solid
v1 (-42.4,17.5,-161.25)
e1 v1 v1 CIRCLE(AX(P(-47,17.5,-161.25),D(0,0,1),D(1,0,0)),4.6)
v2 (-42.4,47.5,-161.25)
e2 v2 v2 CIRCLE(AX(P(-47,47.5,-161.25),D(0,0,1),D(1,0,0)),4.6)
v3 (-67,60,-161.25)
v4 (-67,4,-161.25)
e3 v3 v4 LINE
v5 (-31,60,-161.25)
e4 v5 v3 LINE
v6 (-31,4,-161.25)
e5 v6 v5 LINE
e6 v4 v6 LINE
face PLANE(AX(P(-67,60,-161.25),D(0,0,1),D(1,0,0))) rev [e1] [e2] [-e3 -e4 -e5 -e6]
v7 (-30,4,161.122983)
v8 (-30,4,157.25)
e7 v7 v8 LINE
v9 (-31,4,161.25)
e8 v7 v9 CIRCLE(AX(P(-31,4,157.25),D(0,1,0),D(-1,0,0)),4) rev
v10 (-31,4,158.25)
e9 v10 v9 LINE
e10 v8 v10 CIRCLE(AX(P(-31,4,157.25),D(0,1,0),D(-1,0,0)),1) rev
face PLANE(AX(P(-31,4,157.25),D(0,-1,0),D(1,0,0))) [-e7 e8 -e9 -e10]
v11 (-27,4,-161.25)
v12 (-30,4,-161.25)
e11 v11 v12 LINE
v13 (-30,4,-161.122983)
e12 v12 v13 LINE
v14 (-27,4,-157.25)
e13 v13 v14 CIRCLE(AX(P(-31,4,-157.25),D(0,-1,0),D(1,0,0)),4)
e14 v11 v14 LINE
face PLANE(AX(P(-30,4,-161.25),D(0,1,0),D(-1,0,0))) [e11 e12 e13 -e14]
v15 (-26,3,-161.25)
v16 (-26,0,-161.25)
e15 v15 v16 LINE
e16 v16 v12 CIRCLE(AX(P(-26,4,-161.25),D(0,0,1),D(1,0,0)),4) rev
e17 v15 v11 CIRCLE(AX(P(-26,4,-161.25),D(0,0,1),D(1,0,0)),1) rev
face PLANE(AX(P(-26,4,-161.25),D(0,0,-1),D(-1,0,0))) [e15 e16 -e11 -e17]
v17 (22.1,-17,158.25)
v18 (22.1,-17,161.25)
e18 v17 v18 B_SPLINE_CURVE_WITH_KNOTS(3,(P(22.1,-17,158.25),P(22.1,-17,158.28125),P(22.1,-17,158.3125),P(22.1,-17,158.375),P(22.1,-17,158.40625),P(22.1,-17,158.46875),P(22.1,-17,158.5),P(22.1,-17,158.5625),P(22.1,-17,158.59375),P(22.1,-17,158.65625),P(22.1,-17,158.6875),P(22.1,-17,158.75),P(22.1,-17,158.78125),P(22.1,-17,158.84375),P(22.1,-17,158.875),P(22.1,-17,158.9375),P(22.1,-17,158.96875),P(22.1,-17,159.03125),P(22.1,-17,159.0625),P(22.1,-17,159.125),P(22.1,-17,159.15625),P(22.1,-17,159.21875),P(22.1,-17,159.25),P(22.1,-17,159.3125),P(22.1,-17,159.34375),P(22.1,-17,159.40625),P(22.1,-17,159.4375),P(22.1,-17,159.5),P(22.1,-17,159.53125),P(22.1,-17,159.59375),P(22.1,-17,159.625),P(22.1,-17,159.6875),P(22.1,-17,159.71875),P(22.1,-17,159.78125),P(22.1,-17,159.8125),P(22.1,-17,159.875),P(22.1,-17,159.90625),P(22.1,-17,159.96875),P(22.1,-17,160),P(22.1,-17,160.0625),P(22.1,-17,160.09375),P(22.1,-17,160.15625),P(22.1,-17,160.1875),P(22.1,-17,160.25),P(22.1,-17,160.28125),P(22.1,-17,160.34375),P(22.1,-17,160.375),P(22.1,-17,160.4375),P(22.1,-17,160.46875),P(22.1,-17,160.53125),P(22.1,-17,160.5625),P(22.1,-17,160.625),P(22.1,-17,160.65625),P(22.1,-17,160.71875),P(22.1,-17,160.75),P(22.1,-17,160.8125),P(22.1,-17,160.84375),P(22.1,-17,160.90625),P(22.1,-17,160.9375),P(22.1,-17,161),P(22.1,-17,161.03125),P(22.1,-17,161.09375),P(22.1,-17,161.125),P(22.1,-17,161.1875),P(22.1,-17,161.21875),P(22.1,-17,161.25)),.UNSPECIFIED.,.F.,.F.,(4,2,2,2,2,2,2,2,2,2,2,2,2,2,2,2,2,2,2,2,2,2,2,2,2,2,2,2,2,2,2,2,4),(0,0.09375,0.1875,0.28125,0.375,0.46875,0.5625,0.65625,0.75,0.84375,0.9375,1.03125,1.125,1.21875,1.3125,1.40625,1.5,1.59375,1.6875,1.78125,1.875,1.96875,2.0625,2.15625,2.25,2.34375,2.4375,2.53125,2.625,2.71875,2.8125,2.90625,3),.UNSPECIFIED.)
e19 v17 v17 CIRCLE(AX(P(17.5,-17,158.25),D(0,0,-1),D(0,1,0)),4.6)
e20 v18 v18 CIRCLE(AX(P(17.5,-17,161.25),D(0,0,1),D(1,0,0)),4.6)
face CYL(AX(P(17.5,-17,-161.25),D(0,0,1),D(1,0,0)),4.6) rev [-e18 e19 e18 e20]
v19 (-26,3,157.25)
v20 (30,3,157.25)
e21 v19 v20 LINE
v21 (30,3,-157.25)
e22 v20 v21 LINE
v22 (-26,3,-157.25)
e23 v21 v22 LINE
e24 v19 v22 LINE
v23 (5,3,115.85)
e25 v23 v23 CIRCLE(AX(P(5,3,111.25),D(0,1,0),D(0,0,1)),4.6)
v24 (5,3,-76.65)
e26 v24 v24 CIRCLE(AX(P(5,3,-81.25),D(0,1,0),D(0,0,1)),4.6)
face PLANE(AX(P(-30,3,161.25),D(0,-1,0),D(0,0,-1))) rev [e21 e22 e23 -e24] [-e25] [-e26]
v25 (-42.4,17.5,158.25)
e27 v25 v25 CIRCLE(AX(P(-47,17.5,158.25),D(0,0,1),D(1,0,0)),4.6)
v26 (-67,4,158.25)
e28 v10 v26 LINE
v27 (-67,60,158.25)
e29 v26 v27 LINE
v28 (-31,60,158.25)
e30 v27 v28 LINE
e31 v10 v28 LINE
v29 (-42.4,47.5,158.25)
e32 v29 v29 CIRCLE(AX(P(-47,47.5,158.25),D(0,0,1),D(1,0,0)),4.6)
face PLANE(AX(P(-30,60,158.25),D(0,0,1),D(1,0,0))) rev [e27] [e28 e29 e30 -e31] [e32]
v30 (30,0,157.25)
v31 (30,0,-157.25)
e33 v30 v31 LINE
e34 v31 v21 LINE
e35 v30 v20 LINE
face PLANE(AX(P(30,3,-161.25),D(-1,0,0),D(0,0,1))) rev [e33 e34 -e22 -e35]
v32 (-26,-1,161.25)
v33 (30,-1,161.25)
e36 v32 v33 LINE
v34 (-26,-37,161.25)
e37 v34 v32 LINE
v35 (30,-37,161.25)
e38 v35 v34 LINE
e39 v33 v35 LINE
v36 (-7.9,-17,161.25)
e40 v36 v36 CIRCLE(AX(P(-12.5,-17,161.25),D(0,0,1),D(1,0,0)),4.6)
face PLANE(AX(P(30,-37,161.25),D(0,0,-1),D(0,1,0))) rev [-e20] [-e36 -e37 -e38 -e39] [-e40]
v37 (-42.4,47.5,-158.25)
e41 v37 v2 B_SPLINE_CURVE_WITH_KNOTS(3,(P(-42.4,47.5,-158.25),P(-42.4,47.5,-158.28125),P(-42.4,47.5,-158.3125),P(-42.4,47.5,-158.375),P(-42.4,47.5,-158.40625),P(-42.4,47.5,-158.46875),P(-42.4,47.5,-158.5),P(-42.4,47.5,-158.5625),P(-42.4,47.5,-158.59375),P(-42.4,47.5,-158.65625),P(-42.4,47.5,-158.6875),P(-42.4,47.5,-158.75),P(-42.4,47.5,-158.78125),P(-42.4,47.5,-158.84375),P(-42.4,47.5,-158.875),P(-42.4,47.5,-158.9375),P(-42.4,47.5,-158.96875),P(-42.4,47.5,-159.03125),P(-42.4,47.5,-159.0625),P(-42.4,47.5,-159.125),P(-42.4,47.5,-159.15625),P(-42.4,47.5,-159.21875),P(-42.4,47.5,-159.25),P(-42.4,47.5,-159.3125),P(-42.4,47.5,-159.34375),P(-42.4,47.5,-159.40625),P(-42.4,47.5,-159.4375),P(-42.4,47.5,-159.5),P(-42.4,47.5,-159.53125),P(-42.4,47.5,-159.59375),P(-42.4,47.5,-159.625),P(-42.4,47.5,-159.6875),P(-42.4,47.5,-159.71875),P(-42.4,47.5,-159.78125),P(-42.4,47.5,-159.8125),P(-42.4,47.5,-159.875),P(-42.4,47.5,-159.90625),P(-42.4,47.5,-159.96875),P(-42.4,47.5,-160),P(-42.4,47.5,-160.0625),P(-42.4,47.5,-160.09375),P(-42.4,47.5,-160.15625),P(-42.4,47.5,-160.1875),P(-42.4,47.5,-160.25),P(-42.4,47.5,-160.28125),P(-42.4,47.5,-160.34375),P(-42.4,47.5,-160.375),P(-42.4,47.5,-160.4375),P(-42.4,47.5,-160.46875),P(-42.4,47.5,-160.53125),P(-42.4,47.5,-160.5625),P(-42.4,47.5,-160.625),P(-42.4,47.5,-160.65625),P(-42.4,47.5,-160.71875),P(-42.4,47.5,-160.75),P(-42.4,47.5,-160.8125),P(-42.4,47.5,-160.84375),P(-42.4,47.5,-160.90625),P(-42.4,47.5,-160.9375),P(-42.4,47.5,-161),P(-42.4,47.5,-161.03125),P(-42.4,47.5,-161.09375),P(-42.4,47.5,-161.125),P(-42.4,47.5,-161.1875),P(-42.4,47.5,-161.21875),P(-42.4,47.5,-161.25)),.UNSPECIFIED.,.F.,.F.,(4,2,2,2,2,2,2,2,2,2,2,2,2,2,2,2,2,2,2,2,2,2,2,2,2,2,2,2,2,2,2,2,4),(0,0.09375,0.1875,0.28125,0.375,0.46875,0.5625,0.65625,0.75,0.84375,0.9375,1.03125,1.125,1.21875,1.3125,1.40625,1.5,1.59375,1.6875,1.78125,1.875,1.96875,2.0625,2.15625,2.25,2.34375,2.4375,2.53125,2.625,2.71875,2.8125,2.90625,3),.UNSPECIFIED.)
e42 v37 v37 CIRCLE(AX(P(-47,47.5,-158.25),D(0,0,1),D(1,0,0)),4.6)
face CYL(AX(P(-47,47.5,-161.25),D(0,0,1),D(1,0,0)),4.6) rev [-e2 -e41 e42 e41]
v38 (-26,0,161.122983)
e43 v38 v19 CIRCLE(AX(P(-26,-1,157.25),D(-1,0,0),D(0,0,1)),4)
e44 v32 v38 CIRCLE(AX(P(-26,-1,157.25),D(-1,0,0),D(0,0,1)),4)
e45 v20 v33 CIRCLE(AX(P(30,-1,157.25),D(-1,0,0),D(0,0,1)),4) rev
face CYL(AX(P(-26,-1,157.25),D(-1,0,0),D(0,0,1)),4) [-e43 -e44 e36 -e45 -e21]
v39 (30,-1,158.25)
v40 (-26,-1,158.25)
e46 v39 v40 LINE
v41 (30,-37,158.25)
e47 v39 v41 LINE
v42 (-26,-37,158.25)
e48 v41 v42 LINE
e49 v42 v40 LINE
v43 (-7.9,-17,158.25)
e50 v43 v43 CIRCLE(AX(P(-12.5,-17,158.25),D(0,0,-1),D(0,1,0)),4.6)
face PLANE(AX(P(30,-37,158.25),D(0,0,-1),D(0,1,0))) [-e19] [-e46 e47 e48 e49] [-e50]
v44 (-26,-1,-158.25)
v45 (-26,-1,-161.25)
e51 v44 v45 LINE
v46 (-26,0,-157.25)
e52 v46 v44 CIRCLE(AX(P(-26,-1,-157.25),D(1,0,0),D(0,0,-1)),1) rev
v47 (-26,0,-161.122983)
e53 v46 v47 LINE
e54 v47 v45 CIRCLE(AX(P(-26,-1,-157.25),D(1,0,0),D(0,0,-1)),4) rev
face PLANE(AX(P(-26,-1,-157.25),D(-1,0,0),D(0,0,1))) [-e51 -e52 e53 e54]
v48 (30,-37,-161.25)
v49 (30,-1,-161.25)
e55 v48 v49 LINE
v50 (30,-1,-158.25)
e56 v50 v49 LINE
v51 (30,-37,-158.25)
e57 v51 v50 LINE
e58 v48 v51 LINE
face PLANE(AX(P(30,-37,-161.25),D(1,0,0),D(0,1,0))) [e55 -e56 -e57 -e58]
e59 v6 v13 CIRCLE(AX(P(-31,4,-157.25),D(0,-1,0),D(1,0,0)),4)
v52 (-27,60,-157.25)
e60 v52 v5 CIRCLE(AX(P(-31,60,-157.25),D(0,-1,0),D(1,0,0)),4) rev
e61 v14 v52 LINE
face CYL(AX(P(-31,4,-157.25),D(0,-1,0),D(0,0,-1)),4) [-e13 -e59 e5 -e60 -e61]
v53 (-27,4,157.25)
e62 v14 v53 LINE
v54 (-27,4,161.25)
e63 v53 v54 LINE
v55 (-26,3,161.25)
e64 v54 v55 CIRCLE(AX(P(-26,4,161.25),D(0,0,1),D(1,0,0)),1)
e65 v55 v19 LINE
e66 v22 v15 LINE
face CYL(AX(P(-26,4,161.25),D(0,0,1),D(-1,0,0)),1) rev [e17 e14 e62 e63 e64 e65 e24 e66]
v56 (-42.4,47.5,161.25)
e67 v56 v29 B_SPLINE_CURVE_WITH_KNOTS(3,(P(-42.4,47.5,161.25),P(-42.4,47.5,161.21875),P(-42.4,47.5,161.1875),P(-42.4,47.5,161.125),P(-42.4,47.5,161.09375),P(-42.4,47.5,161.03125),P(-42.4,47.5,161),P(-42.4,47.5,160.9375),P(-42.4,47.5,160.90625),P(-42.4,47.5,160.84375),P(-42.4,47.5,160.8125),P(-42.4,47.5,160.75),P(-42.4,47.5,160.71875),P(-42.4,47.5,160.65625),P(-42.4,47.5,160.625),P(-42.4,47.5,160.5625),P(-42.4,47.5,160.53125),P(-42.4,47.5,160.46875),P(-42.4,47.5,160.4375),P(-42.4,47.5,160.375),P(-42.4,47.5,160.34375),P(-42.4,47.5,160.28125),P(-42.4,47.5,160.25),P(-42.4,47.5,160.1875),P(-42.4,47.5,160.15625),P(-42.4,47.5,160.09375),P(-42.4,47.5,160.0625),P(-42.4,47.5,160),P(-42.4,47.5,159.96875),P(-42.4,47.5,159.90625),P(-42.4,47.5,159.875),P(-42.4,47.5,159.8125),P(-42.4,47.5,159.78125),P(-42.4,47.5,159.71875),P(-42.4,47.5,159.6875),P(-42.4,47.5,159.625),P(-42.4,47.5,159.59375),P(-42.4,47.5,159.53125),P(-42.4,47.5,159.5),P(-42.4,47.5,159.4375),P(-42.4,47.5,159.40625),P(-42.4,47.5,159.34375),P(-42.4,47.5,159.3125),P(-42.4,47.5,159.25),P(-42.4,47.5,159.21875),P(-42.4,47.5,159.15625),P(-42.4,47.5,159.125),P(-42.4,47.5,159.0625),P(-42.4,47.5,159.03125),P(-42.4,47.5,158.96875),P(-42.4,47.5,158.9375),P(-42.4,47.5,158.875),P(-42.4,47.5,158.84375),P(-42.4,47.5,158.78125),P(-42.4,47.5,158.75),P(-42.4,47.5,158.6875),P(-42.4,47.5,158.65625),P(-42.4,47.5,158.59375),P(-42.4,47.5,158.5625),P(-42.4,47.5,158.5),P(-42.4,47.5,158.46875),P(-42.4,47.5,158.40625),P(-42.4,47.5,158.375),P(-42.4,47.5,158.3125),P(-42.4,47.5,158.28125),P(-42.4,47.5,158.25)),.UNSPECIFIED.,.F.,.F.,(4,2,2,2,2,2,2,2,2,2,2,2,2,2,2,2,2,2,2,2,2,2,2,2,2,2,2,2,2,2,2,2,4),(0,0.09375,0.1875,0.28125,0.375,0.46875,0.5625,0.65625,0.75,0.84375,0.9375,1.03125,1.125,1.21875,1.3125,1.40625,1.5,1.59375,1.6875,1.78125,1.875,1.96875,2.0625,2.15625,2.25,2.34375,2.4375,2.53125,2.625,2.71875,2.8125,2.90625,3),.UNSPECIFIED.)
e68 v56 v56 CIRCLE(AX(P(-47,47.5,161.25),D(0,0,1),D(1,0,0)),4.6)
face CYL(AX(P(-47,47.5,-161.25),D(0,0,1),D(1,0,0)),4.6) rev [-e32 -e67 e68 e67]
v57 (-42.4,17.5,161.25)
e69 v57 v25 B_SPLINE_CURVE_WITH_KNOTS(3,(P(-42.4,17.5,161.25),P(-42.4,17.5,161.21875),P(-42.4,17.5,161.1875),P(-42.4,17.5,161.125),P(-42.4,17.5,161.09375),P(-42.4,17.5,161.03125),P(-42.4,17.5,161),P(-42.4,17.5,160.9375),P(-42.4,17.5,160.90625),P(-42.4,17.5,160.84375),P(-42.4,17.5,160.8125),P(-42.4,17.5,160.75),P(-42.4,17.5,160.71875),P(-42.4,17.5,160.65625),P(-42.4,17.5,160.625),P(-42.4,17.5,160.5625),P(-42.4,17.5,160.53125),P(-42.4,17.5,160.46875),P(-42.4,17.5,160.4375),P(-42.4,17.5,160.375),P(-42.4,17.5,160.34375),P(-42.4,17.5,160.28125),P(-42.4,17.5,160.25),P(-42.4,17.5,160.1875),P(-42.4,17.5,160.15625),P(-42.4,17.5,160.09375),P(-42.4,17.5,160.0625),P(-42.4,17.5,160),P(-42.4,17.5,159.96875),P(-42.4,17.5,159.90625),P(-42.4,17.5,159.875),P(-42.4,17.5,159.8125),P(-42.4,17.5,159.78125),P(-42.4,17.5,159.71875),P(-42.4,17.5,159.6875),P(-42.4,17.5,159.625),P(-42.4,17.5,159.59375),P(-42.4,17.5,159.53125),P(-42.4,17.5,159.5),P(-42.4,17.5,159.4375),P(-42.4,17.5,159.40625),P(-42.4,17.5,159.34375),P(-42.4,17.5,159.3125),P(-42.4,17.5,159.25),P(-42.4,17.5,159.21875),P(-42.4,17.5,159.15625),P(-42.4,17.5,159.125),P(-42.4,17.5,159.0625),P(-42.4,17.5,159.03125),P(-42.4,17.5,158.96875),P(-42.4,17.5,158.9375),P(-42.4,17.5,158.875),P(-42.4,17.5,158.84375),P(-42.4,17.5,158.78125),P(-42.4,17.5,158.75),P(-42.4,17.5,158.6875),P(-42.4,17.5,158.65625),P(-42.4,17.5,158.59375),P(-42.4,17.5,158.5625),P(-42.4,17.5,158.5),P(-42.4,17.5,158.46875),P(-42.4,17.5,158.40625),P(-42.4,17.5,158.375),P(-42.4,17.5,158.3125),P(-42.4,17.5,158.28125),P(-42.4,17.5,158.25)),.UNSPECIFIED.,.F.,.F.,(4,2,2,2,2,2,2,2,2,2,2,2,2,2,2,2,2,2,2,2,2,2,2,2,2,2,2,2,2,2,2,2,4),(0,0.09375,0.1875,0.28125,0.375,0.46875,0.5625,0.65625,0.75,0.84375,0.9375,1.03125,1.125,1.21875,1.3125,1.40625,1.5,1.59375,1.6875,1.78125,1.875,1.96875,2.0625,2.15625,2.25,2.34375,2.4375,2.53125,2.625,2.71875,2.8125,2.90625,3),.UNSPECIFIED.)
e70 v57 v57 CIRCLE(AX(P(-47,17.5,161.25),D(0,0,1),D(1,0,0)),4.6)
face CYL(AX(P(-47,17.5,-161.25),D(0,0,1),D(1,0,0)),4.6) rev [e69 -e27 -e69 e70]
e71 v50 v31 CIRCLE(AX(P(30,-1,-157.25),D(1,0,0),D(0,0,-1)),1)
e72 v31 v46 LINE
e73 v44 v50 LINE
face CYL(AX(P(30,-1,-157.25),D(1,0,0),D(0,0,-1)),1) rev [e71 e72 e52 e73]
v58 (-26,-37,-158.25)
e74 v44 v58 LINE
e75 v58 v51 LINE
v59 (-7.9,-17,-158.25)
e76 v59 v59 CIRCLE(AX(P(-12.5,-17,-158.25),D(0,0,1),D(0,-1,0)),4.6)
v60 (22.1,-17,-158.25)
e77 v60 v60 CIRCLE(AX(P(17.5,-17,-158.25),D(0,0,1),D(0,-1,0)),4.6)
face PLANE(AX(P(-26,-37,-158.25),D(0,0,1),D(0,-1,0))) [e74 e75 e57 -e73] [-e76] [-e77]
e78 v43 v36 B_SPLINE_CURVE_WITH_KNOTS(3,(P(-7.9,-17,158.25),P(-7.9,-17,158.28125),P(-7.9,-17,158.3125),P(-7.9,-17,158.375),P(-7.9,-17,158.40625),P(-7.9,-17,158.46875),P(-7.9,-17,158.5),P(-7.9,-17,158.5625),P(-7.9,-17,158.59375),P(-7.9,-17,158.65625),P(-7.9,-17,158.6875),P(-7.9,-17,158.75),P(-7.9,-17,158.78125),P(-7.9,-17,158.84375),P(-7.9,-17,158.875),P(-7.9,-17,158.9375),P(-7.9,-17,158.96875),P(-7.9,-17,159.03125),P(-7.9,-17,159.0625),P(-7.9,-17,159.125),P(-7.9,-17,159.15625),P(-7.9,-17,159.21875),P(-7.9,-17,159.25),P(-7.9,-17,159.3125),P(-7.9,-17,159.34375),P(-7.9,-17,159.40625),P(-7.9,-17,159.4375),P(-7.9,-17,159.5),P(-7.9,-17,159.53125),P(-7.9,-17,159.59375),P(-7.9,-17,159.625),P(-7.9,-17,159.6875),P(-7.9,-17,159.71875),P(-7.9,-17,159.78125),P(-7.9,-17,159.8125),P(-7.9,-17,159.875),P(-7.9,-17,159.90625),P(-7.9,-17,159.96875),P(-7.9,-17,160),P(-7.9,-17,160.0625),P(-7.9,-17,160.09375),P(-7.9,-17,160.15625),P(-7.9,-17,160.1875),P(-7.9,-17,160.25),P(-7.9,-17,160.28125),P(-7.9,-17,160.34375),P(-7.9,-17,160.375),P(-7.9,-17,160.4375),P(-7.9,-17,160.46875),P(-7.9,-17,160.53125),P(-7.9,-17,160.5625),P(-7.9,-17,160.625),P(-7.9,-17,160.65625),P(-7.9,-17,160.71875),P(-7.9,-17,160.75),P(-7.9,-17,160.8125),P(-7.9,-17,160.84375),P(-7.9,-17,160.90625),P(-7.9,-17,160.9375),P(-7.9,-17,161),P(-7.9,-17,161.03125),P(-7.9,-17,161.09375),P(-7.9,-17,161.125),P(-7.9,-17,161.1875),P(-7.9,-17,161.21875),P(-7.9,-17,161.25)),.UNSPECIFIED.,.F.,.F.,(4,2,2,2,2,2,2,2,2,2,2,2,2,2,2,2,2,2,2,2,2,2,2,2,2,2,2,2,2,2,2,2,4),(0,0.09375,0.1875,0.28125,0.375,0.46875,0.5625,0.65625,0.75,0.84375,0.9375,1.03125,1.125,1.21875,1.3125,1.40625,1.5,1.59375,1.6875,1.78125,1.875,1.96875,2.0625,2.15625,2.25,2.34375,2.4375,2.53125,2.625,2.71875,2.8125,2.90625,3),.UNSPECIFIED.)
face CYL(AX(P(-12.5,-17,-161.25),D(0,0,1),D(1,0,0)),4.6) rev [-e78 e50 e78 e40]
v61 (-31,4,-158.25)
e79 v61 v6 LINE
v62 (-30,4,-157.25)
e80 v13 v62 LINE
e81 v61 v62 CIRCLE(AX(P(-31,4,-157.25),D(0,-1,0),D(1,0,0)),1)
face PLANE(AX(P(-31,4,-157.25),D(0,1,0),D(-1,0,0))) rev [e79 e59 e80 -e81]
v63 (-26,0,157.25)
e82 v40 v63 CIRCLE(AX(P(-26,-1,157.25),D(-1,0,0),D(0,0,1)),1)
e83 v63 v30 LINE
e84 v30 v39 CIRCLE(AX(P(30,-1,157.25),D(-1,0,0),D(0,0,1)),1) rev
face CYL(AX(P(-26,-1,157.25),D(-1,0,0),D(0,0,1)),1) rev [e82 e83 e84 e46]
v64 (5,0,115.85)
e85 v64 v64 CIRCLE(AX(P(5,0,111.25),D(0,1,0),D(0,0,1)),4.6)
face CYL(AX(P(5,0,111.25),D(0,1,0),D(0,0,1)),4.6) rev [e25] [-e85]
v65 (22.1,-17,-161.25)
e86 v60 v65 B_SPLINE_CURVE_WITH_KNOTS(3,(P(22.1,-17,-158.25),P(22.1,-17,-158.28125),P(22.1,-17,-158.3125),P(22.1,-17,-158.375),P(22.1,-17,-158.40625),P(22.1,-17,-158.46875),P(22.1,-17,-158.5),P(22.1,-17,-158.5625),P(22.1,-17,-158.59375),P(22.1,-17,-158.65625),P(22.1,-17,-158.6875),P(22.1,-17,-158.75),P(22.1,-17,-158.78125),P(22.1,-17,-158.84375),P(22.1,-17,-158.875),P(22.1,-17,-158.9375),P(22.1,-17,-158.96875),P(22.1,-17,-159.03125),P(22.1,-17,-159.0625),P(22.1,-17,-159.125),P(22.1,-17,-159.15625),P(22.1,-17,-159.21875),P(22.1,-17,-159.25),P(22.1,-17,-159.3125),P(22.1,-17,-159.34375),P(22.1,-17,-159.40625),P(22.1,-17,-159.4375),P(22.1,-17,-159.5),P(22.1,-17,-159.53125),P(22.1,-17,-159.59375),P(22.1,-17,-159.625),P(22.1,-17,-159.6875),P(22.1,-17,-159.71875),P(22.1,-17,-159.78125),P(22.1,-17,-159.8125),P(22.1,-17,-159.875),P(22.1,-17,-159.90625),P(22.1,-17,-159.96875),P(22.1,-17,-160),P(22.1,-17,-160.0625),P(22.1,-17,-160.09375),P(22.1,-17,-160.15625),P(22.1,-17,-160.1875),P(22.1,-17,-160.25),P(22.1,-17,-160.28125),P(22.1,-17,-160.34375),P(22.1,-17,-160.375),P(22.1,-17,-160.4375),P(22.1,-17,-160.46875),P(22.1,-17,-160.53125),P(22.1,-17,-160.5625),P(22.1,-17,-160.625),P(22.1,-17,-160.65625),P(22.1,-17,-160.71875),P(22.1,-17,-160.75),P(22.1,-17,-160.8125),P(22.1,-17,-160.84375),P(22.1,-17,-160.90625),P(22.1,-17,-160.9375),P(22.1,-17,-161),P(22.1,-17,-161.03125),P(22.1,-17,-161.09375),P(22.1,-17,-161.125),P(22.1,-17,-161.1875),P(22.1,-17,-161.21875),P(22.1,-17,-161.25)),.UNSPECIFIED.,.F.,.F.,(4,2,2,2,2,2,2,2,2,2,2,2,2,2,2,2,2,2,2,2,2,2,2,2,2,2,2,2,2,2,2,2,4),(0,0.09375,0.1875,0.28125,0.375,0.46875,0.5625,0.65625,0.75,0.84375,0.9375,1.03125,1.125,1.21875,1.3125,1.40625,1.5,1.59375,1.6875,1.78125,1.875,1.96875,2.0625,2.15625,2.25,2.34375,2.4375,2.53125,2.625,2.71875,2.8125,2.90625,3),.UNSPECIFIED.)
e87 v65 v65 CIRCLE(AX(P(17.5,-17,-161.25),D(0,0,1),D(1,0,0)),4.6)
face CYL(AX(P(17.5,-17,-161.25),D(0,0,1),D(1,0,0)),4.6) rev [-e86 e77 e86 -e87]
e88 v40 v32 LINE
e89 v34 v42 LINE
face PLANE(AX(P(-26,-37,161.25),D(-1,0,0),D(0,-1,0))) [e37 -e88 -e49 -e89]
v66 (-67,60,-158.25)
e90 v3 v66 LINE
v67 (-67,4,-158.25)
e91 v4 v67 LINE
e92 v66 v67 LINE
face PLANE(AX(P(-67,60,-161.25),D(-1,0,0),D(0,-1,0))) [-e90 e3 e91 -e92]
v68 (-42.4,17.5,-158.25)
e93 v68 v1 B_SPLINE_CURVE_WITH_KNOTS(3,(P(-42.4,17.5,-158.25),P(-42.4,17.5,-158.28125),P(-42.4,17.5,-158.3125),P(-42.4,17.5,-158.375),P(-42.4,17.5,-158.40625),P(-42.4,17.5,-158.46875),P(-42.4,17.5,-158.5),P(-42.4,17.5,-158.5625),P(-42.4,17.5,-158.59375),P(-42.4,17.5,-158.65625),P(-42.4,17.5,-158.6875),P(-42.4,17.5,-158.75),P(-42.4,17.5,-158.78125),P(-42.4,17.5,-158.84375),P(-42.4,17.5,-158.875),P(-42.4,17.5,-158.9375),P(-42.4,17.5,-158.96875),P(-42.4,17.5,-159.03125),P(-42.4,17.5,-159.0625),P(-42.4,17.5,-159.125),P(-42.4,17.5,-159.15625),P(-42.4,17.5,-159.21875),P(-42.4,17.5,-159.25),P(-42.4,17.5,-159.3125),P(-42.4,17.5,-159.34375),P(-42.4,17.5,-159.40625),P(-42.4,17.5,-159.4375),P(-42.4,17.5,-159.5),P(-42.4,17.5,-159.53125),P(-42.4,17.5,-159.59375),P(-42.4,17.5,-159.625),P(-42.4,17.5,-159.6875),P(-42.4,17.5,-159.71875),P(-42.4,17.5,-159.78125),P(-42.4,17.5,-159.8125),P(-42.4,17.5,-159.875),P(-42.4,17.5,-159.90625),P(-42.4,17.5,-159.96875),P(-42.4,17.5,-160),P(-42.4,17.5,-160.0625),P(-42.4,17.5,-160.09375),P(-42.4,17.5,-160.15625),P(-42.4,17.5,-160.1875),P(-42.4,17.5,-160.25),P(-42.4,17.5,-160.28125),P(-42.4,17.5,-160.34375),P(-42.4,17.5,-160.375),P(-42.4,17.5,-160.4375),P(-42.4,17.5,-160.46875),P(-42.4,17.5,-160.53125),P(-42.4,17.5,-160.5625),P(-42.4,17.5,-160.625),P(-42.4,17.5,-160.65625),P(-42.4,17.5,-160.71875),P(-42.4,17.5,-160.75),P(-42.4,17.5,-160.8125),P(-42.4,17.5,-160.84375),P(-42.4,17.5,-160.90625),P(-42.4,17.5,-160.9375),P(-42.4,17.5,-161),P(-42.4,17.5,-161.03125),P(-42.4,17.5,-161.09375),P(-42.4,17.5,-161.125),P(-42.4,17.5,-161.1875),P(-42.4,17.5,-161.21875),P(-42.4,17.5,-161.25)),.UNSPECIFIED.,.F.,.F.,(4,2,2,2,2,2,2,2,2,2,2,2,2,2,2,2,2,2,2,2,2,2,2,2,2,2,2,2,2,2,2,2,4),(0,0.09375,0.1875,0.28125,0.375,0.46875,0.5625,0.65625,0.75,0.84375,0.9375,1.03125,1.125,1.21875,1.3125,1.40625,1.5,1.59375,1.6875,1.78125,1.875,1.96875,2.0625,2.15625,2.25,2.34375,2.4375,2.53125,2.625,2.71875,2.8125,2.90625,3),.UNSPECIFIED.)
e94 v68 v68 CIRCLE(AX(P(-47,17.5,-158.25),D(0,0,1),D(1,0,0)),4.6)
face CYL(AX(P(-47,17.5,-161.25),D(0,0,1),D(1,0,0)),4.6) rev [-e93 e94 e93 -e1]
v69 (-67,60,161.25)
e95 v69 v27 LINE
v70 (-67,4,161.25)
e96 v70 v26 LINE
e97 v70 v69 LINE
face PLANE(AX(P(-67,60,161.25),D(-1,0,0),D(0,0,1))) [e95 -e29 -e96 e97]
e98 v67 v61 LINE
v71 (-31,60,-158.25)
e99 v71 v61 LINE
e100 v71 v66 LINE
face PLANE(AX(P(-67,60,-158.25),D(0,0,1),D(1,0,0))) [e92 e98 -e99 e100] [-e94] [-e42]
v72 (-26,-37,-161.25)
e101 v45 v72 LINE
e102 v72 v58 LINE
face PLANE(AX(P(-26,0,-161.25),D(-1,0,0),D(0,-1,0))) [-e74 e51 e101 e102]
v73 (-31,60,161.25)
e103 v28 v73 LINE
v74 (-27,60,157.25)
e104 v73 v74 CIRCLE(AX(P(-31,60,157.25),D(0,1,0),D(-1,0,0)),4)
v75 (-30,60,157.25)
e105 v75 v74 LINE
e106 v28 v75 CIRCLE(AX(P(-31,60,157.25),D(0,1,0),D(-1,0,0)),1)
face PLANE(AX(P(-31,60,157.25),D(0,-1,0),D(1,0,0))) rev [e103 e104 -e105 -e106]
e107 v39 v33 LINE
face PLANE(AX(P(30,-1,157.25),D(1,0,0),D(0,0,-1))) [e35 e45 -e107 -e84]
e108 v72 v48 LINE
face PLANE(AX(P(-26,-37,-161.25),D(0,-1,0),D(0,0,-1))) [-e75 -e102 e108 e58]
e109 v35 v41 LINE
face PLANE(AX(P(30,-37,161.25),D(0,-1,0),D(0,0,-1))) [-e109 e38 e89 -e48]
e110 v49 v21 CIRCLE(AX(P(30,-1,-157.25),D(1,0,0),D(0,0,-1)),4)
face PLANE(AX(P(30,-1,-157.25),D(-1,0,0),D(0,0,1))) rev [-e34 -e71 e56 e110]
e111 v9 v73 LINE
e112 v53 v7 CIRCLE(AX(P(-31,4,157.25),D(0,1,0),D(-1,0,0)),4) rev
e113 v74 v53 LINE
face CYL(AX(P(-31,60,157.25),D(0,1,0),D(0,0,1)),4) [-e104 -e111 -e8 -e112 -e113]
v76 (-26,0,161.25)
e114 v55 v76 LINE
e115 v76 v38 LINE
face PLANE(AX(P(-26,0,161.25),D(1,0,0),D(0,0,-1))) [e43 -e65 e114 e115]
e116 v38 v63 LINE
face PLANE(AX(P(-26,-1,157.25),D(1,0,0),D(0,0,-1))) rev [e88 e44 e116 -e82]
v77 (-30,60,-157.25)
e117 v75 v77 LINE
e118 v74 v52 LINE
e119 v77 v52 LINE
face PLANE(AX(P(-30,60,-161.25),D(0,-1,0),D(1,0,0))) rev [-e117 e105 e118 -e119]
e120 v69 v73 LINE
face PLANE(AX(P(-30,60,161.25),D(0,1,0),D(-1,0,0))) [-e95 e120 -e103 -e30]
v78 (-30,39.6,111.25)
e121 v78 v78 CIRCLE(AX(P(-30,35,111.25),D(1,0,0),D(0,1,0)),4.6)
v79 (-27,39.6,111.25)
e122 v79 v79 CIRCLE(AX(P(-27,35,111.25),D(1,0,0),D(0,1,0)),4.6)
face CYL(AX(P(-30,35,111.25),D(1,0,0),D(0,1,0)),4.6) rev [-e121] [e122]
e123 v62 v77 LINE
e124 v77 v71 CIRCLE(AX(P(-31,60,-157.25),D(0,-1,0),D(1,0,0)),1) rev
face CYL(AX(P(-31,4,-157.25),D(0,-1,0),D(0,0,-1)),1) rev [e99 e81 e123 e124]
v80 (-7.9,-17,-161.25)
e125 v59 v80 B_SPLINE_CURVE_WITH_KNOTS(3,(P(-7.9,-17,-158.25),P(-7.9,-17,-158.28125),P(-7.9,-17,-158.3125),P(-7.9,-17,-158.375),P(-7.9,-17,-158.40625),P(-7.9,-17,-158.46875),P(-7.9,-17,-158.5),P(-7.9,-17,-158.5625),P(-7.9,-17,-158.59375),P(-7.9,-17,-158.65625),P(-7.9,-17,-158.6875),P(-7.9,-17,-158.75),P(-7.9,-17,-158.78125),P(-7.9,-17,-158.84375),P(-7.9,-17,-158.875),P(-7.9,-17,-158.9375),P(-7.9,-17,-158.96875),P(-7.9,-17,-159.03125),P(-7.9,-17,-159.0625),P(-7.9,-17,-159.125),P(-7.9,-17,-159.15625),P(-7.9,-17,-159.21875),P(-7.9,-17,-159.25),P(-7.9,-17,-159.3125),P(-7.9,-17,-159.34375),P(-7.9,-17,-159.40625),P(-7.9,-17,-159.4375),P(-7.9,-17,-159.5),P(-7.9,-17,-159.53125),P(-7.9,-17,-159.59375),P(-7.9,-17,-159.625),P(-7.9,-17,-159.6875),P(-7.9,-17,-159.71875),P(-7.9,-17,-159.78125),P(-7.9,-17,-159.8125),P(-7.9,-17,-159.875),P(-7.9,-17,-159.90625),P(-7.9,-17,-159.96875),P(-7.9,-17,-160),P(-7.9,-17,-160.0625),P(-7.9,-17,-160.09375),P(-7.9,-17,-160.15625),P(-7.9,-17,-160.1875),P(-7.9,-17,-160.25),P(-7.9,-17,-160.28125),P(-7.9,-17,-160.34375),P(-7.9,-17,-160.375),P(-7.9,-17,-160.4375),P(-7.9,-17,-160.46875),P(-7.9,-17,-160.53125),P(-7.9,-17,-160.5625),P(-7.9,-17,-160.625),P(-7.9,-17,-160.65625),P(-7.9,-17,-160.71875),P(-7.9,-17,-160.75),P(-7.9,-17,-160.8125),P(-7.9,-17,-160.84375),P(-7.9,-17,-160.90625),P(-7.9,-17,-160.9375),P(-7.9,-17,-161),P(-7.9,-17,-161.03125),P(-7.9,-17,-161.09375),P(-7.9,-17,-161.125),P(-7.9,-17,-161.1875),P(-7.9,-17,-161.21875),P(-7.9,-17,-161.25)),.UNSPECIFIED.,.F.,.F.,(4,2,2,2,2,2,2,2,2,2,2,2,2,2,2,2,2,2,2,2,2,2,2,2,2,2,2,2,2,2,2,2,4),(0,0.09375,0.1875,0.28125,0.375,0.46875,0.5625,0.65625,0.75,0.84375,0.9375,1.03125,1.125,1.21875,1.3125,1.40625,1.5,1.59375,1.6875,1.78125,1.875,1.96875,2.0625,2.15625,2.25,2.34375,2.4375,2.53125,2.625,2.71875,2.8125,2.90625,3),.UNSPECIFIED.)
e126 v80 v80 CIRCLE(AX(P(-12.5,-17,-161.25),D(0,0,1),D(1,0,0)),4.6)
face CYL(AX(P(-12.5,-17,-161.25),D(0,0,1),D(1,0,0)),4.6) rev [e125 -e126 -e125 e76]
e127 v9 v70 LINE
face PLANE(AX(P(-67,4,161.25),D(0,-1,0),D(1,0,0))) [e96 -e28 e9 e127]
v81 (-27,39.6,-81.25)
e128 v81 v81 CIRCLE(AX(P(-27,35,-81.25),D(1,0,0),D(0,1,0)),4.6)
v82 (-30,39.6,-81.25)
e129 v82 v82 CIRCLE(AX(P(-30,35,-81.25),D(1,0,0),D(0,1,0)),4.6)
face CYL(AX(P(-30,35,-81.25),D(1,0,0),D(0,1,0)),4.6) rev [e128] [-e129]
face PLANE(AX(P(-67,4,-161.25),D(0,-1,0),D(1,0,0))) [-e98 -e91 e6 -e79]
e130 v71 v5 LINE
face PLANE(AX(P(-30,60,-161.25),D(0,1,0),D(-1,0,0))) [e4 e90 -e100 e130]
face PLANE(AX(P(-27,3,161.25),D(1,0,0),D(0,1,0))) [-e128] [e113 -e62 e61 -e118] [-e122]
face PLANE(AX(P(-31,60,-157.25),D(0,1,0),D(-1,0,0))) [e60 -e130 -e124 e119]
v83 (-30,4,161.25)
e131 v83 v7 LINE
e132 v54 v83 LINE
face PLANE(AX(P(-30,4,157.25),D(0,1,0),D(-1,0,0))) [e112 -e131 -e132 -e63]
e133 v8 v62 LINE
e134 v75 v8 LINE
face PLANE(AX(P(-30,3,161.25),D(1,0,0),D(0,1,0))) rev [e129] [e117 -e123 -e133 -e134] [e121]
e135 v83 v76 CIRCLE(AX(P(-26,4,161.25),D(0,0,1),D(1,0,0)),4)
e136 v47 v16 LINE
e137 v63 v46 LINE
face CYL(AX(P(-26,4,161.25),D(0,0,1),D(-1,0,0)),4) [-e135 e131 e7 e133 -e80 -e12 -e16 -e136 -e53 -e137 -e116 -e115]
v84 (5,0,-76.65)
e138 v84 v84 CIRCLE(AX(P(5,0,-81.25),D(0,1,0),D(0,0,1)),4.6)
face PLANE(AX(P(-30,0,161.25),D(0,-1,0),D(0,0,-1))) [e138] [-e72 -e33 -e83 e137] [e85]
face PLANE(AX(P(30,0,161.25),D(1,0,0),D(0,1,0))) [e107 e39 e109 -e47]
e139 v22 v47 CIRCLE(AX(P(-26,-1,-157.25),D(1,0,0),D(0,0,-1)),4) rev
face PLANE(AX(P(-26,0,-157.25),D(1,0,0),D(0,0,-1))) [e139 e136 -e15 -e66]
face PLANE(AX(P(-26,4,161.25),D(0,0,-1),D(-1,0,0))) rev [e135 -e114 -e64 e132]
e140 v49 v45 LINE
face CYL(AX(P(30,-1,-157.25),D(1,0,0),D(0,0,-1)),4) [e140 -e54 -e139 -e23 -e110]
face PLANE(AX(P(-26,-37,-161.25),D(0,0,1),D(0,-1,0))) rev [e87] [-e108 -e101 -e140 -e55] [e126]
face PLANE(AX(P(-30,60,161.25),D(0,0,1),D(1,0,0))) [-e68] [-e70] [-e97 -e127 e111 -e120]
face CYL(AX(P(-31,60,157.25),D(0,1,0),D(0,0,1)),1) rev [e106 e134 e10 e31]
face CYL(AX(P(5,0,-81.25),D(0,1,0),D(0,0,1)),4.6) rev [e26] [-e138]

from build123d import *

# Parameters (mm, degrees)
SKETCH1_W                      = 60
SKETCH1_H                      = 322.5
BASE_FLANGE1_DEPTH             = 3
EDGE_FLANGE1_STRIP_W           = 14
EDGE_FLANGE1_STRIP_H           = 3
EDGE_FLANGE1_STRIP_CUT_DEPTH   = 322.5
EDGE_FLANGE1_DEPTH             = 322.5
EDGE_FLANGE2_STRIP_W           = 14
EDGE_FLANGE2_STRIP_H           = 3
EDGE_FLANGE2_STRIP_CUT_DEPTH   = 56
EDGE_FLANGE2_STRIP_2_W         = 14
EDGE_FLANGE2_STRIP_2_H         = 3
EDGE_FLANGE2_STRIP_CUT_2_DEPTH = 56
EDGE_FLANGE2_STRIP_3_W         = 14
EDGE_FLANGE2_STRIP_3_H         = 3
EDGE_FLANGE2_STRIP_CUT_3_DEPTH = 56
EDGE_FLANGE2_STRIP_4_W         = 14
EDGE_FLANGE2_STRIP_4_H         = 3
EDGE_FLANGE2_STRIP_CUT_4_DEPTH = 56
EDGE_FLANGE2_DEPTH             = 56
EDGE_FLANGE2_BEND_DEPTH        = 56
EDGE_FLANGE2_BEND_2_DEPTH      = 56
EDGE_FLANGE2_BEND_3_DEPTH      = 56
SKETCH18_R                     = 4.6
EXTRUDE1_DEPTH                 = 335.806287277
SKETCH19_R                     = 4.6
EXTRUDE2_DEPTH                 = 3
SKETCH20_R                     = 4.6
EXTRUDE3_DEPTH                 = 3


# Sheet-metal steps are written as plain solids
with BuildPart() as part:
    # Sketch1 → Base-Flange1 (new body)
    with BuildSketch(Plane(origin=(0, 0, 0), x_dir=(1, 0, 0), z_dir=(0, 1, 0))):
        Rectangle(SKETCH1_W, SKETCH1_H)
    extrude(amount=BASE_FLANGE1_DEPTH)

    # Edge-Flange1 strip (across the edge) → Edge-Flange1 strip cut (cut)
    with BuildSketch(Plane(origin=(-30, 3, -161.25), x_dir=(1, 0, 0), z_dir=(0, 0, 1))):
        with Locations((-3, -1.5)):
            Rectangle(EDGE_FLANGE1_STRIP_W, EDGE_FLANGE1_STRIP_H)
    extrude(amount=EDGE_FLANGE1_STRIP_CUT_DEPTH, mode=Mode.SUBTRACT)

    # Edge-Flange1 section (across the edge) → Edge-Flange1 (add)
    with BuildSketch(Plane(origin=(-30, 3, -161.25), x_dir=(1, 0, 0), z_dir=(0, 0, 1))):
        with BuildLine():
            Line((0, 1), (0, 57))
            Line((0, 57), (3, 57))
            Line((3, 57), (3, 1))
            ThreePointArc((3, 1), (3.292893219, 0.292893219), (4, 0))
            Line((4, 0), (4, -3))
            ThreePointArc((4, -3), (1.171572875, -1.828427125), (0, 1))
        make_face()
    extrude(amount=EDGE_FLANGE1_DEPTH)

    # Edge-Flange2 strip (across the edge) → Edge-Flange2 strip cut (cut)
    with BuildSketch(Plane(origin=(-30, 4, 161.25), x_dir=(0, 0, -1), z_dir=(0, 1, 0))):
        with Locations((-3, -1.5)):
            Rectangle(EDGE_FLANGE2_STRIP_W, EDGE_FLANGE2_STRIP_H)
    extrude(amount=EDGE_FLANGE2_STRIP_CUT_DEPTH, mode=Mode.SUBTRACT)

    # Edge-Flange2 strip 2 (across the edge) → Edge-Flange2 strip cut 2 (cut)
    with BuildSketch(Plane(origin=(30, 0, 161.25), x_dir=(0, 0, -1), z_dir=(-1, 0, 0))):
        with Locations((-3, -1.5)):
            Rectangle(EDGE_FLANGE2_STRIP_2_W, EDGE_FLANGE2_STRIP_2_H)
    extrude(amount=EDGE_FLANGE2_STRIP_CUT_2_DEPTH, mode=Mode.SUBTRACT)

    # Edge-Flange2 strip 3 (across the edge) → Edge-Flange2 strip cut 3 (cut)
    with BuildSketch(Plane(origin=(-30, 60, -161.25), x_dir=(0, 0, 1), z_dir=(0, -1, 0))):
        with Locations((-3, -1.5)):
            Rectangle(EDGE_FLANGE2_STRIP_3_W, EDGE_FLANGE2_STRIP_3_H)
    extrude(amount=EDGE_FLANGE2_STRIP_CUT_3_DEPTH, mode=Mode.SUBTRACT)

    # Edge-Flange2 strip 4 (across the edge) → Edge-Flange2 strip cut 4 (cut)
    with BuildSketch(Plane(origin=(-26, 0, -161.25), x_dir=(0, 0, 1), z_dir=(1, 0, 0))):
        with Locations((-3, -1.5)):
            Rectangle(EDGE_FLANGE2_STRIP_4_W, EDGE_FLANGE2_STRIP_4_H)
    extrude(amount=EDGE_FLANGE2_STRIP_CUT_4_DEPTH, mode=Mode.SUBTRACT)

    # Edge-Flange2 section (across the edge) → Edge-Flange2 (add)
    with BuildSketch(Plane(origin=(-30, 4, 161.25), x_dir=(0, 0, -1), z_dir=(0, 1, 0))):
        with BuildLine():
            Line((0, 1), (0, 37))
            Line((0, 37), (3, 37))
            Line((3, 37), (3, 1))
            ThreePointArc((3, 1), (3.292893219, 0.292893219), (4, 0))
            Line((4, 0), (4, -3))
            ThreePointArc((4, -3), (1.171572875, -1.828427125), (0, 1))
        make_face()
    extrude(amount=EDGE_FLANGE2_DEPTH)

    # Edge-Flange2 section 2 (across the edge) → Edge-Flange2 bend (add)
    with BuildSketch(Plane(origin=(30, 0, 161.25), x_dir=(0, 0, -1), z_dir=(-1, 0, 0))):
        with BuildLine():
            Line((0, 1), (0, 37))
            Line((0, 37), (3, 37))
            Line((3, 37), (3, 1))
            ThreePointArc((3, 1), (3.292893219, 0.292893219), (4, 0))
            Line((4, 0), (4, -3))
            ThreePointArc((4, -3), (1.171572875, -1.828427125), (0, 1))
        make_face()
    extrude(amount=EDGE_FLANGE2_BEND_DEPTH)

    # Edge-Flange2 section 3 (across the edge) → Edge-Flange2 bend 2 (add)
    with BuildSketch(Plane(origin=(-30, 60, -161.25), x_dir=(0, 0, 1), z_dir=(0, -1, 0))):
        with BuildLine():
            Line((0, 1), (0, 37))
            Line((0, 37), (3, 37))
            Line((3, 37), (3, 1))
            ThreePointArc((3, 1), (3.292893219, 0.292893219), (4, 0))
            Line((4, 0), (4, -3))
            ThreePointArc((4, -3), (1.171572875, -1.828427125), (0, 1))
        make_face()
    extrude(amount=EDGE_FLANGE2_BEND_2_DEPTH)

    # Edge-Flange2 section 4 (across the edge) → Edge-Flange2 bend 3 (add)
    with BuildSketch(Plane(origin=(-26, 0, -161.25), x_dir=(0, 0, 1), z_dir=(1, 0, 0))):
        with BuildLine():
            Line((0, 1), (0, 37))
            Line((0, 37), (3, 37))
            Line((3, 37), (3, 1))
            ThreePointArc((3, 1), (3.292893219, 0.292893219), (4, 0))
            Line((4, 0), (4, -3))
            ThreePointArc((4, -3), (1.171572875, -1.828427125), (0, 1))
        make_face()
    extrude(amount=EDGE_FLANGE2_BEND_3_DEPTH)

    # Sketch18 → Extrude1 (cut, through all)
    with BuildSketch(Plane.XY.offset(161.25)):
        with Locations((-47, 47.5)):
            Circle(SKETCH18_R)
        with Locations((-47, 17.5)):
            Circle(SKETCH18_R)
        with Locations((-12.5, -17)):
            Circle(SKETCH18_R)
        with Locations((17.5, -17)):
            Circle(SKETCH18_R)
    extrude(amount=-EXTRUDE1_DEPTH, mode=Mode.SUBTRACT)

    # Sketch19 → Extrude2 (cut)
    with BuildSketch(Plane(origin=(-27, 0, 0), x_dir=(0, 0, -1), z_dir=(1, 0, 0))):
        with Locations(Location((-111.25, 35, 0), (0, 0, 90))):
            Circle(SKETCH19_R)
        with Locations(Location((81.25, 35, 0), (0, 0, 90))):
            Circle(SKETCH19_R)
    extrude(amount=-EXTRUDE2_DEPTH, mode=Mode.SUBTRACT)

    # Sketch20 → Extrude3 (cut)
    with BuildSketch(Plane(origin=(0, 3, 0), x_dir=(1, 0, 0), z_dir=(0, 1, 0))):
        with Locations(Location((5, 81.25, 0), (0, 0, 270))):
            Circle(SKETCH20_R)
        with Locations(Location((5, -111.25, 0), (0, 0, 270))):
            Circle(SKETCH20_R)
    extrude(amount=-EXTRUDE3_DEPTH, mode=Mode.SUBTRACT)


solid = part.part
